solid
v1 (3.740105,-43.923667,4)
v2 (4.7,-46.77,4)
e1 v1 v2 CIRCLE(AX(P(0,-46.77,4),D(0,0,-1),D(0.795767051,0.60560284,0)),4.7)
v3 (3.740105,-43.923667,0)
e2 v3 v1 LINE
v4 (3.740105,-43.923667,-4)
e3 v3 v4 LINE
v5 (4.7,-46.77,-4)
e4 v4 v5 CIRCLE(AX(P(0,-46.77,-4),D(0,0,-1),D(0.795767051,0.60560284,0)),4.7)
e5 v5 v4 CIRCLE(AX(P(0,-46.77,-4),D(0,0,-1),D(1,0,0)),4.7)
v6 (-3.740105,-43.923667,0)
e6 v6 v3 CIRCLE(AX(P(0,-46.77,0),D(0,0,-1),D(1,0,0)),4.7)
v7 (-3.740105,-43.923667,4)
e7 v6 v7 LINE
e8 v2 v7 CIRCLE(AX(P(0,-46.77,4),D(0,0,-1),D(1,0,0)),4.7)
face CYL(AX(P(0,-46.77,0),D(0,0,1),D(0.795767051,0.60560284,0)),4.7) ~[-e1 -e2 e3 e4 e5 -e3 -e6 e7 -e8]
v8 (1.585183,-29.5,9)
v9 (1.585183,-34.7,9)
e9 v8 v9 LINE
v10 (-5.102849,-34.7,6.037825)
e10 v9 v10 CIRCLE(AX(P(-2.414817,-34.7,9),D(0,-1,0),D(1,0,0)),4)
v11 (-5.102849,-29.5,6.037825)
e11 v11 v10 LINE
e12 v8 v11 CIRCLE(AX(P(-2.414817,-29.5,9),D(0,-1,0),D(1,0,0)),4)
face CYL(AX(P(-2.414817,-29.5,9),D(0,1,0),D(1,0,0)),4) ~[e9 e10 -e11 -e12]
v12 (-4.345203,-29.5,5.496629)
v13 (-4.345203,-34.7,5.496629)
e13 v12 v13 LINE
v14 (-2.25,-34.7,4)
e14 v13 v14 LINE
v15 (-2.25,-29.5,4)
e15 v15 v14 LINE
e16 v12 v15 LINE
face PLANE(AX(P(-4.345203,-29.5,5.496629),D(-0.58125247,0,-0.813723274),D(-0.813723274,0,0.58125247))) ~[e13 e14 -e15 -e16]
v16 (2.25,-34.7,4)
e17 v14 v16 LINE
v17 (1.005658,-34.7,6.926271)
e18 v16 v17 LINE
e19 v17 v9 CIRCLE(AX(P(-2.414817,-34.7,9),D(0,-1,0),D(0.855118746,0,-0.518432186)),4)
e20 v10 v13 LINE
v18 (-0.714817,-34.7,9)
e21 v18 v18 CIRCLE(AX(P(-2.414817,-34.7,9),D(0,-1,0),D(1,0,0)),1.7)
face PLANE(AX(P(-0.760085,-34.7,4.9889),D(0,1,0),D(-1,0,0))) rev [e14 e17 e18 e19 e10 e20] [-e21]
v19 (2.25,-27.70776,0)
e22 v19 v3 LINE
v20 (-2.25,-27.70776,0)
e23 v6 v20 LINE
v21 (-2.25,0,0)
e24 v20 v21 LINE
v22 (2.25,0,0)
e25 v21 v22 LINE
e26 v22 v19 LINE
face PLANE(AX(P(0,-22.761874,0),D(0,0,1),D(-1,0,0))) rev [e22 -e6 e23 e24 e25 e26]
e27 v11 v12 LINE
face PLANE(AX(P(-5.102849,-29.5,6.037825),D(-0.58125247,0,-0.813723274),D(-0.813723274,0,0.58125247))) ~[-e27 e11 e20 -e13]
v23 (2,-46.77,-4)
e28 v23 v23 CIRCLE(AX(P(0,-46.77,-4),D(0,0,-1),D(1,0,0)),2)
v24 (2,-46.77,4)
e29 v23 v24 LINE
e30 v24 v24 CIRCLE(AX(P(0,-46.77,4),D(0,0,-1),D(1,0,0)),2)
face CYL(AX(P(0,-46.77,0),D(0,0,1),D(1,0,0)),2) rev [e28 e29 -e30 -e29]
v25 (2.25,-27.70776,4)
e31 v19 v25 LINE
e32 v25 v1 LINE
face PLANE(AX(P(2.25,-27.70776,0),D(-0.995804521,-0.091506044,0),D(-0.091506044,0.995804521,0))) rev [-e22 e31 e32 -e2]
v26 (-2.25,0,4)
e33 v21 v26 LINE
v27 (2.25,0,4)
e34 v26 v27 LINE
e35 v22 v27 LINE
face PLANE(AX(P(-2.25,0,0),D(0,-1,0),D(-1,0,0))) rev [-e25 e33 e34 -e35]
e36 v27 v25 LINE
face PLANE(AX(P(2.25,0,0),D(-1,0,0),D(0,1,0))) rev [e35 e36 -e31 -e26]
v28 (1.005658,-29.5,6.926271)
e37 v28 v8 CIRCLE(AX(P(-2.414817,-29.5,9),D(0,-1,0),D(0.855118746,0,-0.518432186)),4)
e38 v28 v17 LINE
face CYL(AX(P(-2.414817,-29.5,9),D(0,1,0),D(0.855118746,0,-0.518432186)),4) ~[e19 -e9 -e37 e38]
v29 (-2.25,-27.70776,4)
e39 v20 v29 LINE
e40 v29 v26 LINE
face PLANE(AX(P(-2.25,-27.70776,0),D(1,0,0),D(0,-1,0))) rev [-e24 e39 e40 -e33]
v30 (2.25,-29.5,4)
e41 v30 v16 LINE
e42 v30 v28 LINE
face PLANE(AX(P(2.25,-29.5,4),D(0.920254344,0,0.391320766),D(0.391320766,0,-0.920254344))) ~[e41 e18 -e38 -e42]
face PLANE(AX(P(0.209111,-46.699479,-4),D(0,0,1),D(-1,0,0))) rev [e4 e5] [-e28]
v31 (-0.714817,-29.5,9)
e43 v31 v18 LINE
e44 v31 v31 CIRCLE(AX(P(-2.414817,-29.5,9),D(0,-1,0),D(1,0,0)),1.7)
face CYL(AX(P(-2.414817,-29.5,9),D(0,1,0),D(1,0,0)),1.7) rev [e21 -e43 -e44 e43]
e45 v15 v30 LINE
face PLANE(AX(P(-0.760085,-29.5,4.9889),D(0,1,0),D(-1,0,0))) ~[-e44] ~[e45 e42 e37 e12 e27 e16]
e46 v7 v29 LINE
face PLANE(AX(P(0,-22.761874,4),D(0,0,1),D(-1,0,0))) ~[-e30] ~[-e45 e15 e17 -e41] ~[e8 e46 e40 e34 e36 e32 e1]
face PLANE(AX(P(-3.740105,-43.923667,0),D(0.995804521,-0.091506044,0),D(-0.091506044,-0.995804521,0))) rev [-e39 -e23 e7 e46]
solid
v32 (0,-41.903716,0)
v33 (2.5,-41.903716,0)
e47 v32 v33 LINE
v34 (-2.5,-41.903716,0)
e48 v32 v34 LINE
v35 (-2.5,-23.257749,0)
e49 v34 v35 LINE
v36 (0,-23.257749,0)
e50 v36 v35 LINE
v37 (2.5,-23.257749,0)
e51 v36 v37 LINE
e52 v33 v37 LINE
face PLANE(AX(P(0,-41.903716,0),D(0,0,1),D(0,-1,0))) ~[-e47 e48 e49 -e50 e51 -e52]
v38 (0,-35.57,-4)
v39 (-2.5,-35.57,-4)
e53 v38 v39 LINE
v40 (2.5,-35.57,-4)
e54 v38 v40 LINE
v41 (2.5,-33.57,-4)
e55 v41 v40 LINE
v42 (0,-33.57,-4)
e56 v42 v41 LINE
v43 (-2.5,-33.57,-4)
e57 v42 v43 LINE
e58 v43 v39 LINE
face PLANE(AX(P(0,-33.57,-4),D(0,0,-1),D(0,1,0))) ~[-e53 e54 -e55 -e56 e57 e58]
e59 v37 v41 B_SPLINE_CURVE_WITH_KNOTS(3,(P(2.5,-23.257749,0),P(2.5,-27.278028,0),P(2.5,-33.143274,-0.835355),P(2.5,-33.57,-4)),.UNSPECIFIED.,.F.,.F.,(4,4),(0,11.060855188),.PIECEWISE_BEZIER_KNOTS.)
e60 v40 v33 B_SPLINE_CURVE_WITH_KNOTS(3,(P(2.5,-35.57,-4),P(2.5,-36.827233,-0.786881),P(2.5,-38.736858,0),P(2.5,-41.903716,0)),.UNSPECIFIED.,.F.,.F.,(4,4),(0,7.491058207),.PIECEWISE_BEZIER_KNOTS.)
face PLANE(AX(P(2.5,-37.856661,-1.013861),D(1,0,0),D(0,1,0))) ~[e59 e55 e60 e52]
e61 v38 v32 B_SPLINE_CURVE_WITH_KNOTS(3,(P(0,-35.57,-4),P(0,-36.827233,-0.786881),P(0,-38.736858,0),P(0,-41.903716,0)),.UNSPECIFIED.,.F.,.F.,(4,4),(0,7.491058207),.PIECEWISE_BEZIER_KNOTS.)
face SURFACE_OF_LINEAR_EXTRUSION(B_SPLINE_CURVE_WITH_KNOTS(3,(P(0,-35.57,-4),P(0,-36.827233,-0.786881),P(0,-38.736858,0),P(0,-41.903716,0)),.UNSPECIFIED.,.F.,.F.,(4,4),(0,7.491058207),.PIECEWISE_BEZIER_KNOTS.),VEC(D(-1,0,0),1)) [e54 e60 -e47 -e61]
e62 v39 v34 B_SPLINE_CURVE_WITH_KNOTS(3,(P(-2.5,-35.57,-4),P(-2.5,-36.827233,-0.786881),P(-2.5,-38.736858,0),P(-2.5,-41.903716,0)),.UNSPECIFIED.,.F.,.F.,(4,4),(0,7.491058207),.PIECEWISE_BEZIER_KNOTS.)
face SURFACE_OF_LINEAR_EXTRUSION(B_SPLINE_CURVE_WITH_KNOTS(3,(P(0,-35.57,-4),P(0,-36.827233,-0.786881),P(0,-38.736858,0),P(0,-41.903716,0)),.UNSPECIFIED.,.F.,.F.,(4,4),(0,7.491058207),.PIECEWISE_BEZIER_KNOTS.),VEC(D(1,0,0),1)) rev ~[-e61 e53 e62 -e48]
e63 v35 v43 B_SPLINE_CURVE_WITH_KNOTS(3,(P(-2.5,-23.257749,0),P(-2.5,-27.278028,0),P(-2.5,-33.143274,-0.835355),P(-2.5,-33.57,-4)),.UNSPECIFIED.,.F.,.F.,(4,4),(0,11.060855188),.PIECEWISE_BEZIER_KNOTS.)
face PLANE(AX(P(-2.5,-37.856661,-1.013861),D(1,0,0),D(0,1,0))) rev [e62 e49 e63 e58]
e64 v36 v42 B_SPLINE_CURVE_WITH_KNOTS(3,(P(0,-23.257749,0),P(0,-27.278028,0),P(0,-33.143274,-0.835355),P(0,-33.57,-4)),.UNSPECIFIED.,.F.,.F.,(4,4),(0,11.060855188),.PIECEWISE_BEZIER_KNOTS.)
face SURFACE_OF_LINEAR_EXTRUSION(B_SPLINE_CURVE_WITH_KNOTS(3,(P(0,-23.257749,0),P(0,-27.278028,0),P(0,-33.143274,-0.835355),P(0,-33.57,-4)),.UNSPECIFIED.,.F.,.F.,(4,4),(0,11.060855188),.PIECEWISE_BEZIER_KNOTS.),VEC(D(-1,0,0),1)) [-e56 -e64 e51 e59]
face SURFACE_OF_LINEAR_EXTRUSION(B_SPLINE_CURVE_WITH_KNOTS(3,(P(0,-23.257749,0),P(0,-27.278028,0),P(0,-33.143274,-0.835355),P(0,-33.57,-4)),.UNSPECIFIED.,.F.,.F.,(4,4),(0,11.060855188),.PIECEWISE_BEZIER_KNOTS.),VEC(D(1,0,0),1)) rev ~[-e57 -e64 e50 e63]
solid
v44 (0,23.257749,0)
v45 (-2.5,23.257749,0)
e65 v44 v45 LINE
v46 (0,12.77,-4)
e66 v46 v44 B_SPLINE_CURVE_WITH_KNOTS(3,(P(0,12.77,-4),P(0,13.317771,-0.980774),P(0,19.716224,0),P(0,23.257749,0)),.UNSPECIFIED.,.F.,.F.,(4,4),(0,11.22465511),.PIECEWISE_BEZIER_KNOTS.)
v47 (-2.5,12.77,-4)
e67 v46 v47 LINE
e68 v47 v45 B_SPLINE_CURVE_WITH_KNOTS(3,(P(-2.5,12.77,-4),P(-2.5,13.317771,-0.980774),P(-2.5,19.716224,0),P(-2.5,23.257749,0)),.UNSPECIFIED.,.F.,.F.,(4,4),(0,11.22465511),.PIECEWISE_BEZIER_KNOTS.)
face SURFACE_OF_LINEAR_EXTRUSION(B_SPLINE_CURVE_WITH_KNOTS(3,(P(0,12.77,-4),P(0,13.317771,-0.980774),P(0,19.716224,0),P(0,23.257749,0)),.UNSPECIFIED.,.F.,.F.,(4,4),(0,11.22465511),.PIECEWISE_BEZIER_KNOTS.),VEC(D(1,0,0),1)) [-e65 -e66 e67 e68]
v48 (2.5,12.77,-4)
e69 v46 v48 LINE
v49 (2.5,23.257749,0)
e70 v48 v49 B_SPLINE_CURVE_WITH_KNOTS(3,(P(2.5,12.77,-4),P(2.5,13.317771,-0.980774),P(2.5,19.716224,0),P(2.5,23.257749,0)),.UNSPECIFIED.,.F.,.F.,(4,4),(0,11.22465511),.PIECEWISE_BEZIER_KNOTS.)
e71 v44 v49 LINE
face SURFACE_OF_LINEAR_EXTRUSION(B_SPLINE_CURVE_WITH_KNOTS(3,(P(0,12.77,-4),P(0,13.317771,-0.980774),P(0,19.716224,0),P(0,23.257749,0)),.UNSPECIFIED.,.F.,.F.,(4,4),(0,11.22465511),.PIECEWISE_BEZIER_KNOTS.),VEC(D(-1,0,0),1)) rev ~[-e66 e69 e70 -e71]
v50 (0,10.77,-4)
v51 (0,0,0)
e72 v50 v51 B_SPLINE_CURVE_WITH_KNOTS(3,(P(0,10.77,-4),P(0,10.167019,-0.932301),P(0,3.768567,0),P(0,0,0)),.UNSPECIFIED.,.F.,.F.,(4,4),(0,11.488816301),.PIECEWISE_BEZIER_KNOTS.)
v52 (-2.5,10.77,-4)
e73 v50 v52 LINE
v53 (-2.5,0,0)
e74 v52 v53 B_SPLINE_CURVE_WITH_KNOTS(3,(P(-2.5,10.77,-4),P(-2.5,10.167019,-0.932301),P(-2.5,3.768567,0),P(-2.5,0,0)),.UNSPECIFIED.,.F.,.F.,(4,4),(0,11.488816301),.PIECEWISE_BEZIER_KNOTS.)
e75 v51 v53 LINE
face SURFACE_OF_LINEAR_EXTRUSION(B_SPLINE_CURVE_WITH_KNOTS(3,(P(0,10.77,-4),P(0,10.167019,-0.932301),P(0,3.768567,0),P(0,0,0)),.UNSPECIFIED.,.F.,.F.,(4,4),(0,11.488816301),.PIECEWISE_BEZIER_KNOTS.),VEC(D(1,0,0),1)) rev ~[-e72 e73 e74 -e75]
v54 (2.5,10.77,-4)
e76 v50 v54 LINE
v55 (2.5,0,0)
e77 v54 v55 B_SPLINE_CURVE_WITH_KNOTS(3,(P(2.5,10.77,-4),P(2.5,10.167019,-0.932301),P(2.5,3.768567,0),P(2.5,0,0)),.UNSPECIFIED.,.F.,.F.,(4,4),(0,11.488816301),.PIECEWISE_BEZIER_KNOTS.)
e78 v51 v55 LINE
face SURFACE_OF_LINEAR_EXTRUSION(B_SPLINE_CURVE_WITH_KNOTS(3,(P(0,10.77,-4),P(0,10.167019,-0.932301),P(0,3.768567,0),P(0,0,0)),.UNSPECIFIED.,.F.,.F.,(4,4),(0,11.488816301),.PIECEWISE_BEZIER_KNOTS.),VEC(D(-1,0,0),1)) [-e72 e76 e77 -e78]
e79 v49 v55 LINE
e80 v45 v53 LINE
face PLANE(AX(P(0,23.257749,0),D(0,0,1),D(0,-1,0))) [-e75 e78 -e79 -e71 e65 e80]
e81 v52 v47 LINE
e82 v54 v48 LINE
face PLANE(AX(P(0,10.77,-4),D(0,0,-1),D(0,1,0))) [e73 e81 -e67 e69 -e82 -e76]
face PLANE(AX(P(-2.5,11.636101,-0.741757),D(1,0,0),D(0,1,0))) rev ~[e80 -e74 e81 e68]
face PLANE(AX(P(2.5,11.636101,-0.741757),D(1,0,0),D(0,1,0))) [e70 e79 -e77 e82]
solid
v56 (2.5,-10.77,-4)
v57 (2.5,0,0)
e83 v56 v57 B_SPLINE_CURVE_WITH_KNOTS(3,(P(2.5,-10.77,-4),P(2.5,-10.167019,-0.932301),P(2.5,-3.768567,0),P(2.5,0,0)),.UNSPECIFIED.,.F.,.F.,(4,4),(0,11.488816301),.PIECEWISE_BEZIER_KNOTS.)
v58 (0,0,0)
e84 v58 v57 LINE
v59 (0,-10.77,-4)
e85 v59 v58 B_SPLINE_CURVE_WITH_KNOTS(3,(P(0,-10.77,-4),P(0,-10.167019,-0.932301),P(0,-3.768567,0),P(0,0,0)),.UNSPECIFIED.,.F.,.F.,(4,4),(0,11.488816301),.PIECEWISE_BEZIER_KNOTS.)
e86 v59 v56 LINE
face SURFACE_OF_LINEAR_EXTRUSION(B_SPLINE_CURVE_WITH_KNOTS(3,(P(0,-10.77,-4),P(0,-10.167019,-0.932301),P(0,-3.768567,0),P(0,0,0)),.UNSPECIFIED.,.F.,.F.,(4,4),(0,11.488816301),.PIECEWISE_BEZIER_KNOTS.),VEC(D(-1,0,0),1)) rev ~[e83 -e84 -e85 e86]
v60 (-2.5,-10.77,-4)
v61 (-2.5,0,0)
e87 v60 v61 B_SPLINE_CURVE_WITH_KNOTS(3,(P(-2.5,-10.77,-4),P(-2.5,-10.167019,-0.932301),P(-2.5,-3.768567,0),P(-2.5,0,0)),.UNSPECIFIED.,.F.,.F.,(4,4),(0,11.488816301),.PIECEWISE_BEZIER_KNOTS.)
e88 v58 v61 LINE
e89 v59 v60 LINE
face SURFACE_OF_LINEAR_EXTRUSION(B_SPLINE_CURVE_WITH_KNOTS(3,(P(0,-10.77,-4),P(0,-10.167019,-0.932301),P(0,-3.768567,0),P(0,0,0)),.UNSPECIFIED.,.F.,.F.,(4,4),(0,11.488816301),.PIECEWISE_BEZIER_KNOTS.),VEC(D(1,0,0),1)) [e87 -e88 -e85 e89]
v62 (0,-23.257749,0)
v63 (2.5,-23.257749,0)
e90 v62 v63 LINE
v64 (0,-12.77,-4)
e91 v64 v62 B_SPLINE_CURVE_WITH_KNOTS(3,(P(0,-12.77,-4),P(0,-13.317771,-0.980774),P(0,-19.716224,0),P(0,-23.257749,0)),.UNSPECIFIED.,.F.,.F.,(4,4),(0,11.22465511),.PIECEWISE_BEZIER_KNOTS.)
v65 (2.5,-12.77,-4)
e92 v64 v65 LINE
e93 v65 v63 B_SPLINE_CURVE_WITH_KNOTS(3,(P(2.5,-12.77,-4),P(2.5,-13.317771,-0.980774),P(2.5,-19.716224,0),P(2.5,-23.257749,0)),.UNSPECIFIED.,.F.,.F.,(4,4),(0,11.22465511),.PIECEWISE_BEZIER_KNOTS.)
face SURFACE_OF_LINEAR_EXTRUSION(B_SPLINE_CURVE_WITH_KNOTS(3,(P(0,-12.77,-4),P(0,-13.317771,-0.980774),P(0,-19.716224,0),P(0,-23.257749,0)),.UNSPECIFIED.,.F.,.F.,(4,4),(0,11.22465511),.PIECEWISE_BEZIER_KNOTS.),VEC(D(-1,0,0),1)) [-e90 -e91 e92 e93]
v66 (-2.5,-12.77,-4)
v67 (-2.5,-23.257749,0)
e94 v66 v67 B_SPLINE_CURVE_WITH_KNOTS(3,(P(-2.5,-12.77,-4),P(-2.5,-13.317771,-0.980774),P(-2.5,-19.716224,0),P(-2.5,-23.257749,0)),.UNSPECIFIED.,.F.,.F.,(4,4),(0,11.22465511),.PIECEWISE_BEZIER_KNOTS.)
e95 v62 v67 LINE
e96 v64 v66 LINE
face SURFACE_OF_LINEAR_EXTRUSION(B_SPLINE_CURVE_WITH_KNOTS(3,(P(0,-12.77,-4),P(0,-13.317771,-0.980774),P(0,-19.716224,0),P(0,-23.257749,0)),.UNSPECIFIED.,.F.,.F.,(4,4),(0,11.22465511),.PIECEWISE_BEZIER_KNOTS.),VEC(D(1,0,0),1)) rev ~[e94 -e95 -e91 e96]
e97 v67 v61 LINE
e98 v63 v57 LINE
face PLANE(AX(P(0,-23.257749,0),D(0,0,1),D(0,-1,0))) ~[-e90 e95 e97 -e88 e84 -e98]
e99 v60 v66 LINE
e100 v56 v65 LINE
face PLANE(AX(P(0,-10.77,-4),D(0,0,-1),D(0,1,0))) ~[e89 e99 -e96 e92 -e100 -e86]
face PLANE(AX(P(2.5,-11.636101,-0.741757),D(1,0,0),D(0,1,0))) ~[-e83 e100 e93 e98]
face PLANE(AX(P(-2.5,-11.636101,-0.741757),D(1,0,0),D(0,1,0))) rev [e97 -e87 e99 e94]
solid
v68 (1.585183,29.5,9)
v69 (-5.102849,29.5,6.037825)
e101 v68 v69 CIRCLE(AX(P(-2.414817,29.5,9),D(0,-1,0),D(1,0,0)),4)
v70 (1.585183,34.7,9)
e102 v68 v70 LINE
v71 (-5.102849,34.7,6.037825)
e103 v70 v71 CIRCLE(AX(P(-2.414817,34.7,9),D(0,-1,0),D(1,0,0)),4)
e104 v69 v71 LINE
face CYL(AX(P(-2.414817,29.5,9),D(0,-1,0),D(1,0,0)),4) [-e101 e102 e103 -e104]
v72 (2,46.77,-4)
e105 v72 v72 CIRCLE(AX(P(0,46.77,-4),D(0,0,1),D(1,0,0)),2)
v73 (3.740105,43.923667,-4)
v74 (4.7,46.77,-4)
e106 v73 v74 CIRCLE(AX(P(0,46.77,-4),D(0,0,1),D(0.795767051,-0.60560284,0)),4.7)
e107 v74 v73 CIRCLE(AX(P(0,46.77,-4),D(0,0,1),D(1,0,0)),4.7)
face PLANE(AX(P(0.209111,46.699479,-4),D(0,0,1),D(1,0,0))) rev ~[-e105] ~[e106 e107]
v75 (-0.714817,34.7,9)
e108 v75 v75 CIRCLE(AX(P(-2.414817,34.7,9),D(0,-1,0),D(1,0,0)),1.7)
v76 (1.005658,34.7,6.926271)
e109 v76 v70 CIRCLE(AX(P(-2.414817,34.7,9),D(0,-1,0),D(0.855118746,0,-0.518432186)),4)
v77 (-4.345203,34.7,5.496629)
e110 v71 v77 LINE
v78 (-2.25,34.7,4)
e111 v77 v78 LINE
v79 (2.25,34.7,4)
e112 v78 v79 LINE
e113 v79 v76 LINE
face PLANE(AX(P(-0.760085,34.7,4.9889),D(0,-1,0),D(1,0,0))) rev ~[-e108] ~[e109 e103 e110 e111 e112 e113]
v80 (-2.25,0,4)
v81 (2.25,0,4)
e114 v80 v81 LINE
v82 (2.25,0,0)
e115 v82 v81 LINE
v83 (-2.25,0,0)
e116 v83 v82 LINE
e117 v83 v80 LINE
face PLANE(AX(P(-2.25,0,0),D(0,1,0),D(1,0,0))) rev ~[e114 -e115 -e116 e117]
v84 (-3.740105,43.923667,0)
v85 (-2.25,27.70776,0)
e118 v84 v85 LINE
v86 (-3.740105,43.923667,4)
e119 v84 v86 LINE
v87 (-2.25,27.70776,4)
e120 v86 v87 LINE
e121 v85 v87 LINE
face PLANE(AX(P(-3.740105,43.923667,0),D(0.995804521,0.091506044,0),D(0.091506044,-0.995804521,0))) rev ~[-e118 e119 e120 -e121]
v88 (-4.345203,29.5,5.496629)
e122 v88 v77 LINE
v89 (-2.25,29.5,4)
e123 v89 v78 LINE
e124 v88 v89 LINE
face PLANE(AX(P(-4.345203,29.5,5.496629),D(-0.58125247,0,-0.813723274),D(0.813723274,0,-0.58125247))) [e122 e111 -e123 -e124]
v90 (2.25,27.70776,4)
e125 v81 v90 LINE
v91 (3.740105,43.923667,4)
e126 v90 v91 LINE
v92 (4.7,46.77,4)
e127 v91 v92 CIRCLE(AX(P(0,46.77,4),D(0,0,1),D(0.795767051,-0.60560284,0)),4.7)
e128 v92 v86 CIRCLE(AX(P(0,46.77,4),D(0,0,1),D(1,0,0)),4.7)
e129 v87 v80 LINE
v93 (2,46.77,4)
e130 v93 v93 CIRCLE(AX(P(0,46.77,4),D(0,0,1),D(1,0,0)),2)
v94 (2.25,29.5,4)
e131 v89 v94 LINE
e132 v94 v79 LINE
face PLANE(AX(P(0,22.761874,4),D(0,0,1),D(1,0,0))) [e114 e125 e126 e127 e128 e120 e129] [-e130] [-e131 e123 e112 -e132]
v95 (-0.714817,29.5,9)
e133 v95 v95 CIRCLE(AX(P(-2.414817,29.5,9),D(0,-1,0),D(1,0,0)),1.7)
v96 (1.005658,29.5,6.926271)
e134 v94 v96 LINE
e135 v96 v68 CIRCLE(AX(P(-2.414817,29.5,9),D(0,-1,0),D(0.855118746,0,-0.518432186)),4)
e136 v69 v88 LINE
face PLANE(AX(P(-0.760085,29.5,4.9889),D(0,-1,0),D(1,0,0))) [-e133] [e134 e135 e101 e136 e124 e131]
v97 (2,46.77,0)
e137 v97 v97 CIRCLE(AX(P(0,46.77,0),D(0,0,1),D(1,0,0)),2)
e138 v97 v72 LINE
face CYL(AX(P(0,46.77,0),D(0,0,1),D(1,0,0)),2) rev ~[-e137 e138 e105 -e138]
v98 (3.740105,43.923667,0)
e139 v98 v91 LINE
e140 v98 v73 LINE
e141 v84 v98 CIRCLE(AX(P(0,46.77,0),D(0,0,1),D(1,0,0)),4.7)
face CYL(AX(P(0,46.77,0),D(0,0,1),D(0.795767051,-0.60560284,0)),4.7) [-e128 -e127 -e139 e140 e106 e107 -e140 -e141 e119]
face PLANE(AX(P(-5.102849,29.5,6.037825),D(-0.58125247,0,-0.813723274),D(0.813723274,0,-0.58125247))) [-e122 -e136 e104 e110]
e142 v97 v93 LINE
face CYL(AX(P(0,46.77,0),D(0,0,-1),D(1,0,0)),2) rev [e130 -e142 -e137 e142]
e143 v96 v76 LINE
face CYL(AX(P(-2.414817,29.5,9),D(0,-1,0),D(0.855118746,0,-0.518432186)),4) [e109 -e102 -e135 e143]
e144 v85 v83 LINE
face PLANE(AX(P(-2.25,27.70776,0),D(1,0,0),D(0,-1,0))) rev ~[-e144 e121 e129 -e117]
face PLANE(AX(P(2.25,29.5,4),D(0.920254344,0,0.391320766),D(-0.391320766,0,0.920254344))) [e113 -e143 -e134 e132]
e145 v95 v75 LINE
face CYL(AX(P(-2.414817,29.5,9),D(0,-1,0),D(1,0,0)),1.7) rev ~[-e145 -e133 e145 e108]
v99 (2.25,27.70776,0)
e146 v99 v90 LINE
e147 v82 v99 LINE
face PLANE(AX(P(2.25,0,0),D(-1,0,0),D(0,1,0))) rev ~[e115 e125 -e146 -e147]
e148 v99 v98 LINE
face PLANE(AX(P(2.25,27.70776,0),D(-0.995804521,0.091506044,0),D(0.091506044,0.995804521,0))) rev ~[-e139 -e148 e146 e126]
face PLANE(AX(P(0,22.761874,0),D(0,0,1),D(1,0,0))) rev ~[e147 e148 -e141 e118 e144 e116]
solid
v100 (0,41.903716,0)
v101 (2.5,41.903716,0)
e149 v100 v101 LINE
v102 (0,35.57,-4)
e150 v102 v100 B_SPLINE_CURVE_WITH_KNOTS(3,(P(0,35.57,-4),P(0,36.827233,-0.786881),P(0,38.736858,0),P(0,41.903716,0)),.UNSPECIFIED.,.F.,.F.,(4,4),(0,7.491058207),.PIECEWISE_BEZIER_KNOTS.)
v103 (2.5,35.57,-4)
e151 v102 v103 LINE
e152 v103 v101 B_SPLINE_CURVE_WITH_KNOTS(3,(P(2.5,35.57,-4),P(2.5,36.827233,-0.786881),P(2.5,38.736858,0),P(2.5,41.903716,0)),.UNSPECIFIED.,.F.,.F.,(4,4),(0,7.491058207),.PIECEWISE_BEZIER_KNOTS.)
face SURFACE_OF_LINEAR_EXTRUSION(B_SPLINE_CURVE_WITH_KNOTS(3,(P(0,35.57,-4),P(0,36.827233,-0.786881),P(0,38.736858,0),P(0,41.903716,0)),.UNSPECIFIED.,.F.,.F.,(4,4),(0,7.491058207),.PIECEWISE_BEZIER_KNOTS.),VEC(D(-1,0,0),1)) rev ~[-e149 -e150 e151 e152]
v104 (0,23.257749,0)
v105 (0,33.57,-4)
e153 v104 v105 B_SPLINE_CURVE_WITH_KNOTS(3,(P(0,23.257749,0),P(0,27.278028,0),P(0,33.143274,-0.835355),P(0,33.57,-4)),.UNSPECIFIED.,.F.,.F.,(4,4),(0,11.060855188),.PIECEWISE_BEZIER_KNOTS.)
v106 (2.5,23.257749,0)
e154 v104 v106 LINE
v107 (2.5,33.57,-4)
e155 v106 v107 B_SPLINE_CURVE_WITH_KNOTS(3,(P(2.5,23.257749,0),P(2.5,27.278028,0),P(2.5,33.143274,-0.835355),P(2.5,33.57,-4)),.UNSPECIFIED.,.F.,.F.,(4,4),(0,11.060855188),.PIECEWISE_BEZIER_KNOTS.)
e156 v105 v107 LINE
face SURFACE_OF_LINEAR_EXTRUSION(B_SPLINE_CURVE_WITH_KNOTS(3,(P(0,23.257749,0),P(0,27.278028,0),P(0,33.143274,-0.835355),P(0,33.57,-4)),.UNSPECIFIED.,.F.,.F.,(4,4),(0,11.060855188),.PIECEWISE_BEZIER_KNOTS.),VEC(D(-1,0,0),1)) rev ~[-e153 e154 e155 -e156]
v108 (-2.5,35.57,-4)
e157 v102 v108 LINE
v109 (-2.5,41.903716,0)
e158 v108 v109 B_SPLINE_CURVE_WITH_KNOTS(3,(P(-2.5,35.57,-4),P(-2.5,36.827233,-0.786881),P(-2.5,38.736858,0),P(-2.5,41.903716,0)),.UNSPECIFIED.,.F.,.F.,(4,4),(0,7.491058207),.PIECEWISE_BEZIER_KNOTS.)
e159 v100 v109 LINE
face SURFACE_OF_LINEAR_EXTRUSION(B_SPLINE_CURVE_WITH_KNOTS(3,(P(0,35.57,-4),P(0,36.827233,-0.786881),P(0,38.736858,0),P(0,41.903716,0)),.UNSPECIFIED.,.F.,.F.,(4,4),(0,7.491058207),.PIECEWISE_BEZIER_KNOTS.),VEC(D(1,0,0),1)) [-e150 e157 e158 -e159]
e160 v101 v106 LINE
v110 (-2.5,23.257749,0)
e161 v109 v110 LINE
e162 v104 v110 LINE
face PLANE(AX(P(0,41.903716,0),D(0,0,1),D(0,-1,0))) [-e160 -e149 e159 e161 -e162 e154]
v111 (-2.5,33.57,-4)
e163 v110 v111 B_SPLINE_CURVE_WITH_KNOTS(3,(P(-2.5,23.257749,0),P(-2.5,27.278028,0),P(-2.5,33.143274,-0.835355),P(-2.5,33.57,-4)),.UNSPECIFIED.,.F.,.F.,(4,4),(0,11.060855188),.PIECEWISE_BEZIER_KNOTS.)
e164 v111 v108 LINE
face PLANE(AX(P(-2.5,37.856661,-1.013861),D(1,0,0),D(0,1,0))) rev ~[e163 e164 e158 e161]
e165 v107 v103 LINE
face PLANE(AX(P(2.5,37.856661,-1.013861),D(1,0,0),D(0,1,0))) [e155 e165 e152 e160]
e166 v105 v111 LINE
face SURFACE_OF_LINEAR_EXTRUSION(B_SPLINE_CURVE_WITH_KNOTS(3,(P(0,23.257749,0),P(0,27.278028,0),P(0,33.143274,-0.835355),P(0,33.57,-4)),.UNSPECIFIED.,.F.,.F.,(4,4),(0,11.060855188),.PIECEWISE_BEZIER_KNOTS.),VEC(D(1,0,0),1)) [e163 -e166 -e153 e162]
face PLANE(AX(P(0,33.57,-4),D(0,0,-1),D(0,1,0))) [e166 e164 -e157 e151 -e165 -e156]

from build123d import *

# Parameters (mm, degrees)
F0_R     = 2
F1_DEPTH = 4
F3_START = -29.5
F2_R     = 1.7
F3_DEPTH = 5.2
F4_DEPTH = 4
F6_DEPTH = 2.5


# Not quite as in the source:
# - a feature names something its author has since deleted; it is built from what else it names


with BuildPart() as f1:
    # F0 (on Top) → F1 (new body)
    with BuildSketch(Plane.XY):
        with BuildLine():
            ThreePointArc((3.7401051407, 43.9236666505), (0, 42.07), (-3.7401051407, 43.9236666505))
            Line((-3.7401051407, 43.9236666505), (-2.25, 27.707760334))
            Line((-2.25, 27.707760334), (-2.25, 0))
            Line((-2.25, 0), (0, 0))
            Line((0, 0), (2.25, 0))
            Line((2.25, 0), (2.25, 27.707760334))
            Line((2.25, 27.707760334), (3.7401051407, 43.9236666505))
        make_face()
        with BuildLine():
            ThreePointArc((3.7401051407, 43.9236666505), (4.4535656592, 45.2680835845), (4.7, 46.77))
            ThreePointArc((4.7, 46.77), (-1.5019164155, 51.2235656592), (-3.7401051407, 43.9236666505))
            ThreePointArc((-3.7401051407, 43.9236666505), (0, 42.07), (3.7401051407, 43.9236666505))
        make_face()
        with Locations((0, 46.77)):
            Circle(F0_R, mode=Mode.SUBTRACT)
    extrude(amount=F1_DEPTH)

    # F2 (on Front) → F3 (join)
    with BuildSketch(Plane.XZ.offset(F3_START)):
        with BuildLine():
            Line((2.25, 4), (1.0056584573, 6.9262712577))
            ThreePointArc((1.0056584573, 6.9262712577), (-1.3823144995, 5.1355544295), (-4.3452027561, 5.4966289094))
            Line((-4.3452027561, 5.4966289094), (-2.25, 4))
            Line((-2.25, 4), (2.25, 4))
        make_face()
        with BuildLine():
            ThreePointArc((1.0056584573, 6.9262712577), (1.4375788293, 7.9234081388), (1.5851834752, 9))
            ThreePointArc((1.5851834752, 9), (-4.0346730574, 12.657330285), (-5.1028489317, 6.037824823))
            Line((-5.1028489317, 6.037824823), (-4.3452027561, 5.4966289094))
            ThreePointArc((-4.3452027561, 5.4966289094), (-1.3823144995, 5.1355544295), (1.0056584573, 6.9262712577))
        make_face()
        with Locations((-2.4148165248, 9)):
            Circle(F2_R, mode=Mode.SUBTRACT)
    extrude(amount=-F3_DEPTH)

    # F0 (on Top) → F4 (join)
    with BuildSketch(Plane.XY):
        with BuildLine():
            ThreePointArc((3.7401051407, 43.9236666505), (4.4535656592, 45.2680835845), (4.7, 46.77))
            ThreePointArc((4.7, 46.77), (-1.5019164155, 51.2235656592), (-3.7401051407, 43.9236666505))
            ThreePointArc((-3.7401051407, 43.9236666505), (0, 42.07), (3.7401051407, 43.9236666505))
        make_face()
        with Locations((0, 46.77)):
            Circle(F0_R, mode=Mode.SUBTRACT)
    extrude(amount=-F4_DEPTH)


with BuildPart() as f6:
    # F5 (on Right) → F6 (new body, symmetric)
    with BuildSketch(Plane.YZ):
        with BuildLine():
            Line((41.9037155807, 0), (35.57, 0))
            Line((35.57, 0), (35.57, -4))
            add(Edge.make_bspline(
                [(35.57, -4), (36.8272326887, -0.7868814864), (38.7368577904, 0), (41.9037155807, 0)],
                knots=[0, 0, 0, 0, 7.4910582068, 7.4910582068, 7.4910582068, 7.4910582068], degree=3))
        make_face()
        with BuildLine():
            Line((35.57, -4), (35.57, 0))
            Line((35.57, 0), (23.2577491552, 0))
            add(Edge.make_bspline(
                [(23.2577491552, 0), (27.2780284286, 0), (33.1432744861, -0.8353546145), (33.57, -4)],
                knots=[0, 0, 0, 0, 11.0608551879, 11.0608551879, 11.0608551879, 11.0608551879], degree=3))
            Line((33.57, -4), (35.57, -4))
        make_face()
    extrude(amount=F6_DEPTH, both=True)


with BuildPart() as f6b:
    # F5 (on Right) → F6, piece 2 (new body, symmetric)
    with BuildSketch(Plane.YZ):
        with BuildLine():
            add(Edge.make_bspline(
                [(12.77, -4), (13.317771256, -0.9807739407), (19.7162237018, 0), (23.2577491552, 0)],
                knots=[0, 0, 0, 0, 11.2246551101, 11.2246551101, 11.2246551101, 11.2246551101], degree=3))
            Line((23.2577491552, 0), (0, 0))
            add(Edge.make_bspline(
                [(10.77, -4), (10.1670185104, -0.9323008708), (3.7685674615, 0), (0, 0)],
                knots=[0, 0, 0, 0, 11.4888163011, 11.4888163011, 11.4888163011, 11.4888163011], degree=3))
            Line((10.77, -4), (12.77, -4))
        make_face()
    extrude(amount=F6_DEPTH, both=True)


with BuildPart() as f7_1:
    # F7: instance of F1
    add(f1.part.mirror(Plane(origin=(0, 0, 2), x_dir=(1, 0, 0), z_dir=(0, -1, 0))))


with BuildPart() as f7_2:
    # F7: instance of F6
    add(f6.part.mirror(Plane(origin=(0, 0, 2), x_dir=(1, 0, 0), z_dir=(0, -1, 0))))


with BuildPart() as f7_3:
    # F7: instance of F6b
    add(f6b.part.mirror(Plane(origin=(0, 0, 2), x_dir=(1, 0, 0), z_dir=(0, -1, 0))))


solid = Compound([f1.part, f6.part, f6b.part, f7_1.part, f7_2.part, f7_3.part])
